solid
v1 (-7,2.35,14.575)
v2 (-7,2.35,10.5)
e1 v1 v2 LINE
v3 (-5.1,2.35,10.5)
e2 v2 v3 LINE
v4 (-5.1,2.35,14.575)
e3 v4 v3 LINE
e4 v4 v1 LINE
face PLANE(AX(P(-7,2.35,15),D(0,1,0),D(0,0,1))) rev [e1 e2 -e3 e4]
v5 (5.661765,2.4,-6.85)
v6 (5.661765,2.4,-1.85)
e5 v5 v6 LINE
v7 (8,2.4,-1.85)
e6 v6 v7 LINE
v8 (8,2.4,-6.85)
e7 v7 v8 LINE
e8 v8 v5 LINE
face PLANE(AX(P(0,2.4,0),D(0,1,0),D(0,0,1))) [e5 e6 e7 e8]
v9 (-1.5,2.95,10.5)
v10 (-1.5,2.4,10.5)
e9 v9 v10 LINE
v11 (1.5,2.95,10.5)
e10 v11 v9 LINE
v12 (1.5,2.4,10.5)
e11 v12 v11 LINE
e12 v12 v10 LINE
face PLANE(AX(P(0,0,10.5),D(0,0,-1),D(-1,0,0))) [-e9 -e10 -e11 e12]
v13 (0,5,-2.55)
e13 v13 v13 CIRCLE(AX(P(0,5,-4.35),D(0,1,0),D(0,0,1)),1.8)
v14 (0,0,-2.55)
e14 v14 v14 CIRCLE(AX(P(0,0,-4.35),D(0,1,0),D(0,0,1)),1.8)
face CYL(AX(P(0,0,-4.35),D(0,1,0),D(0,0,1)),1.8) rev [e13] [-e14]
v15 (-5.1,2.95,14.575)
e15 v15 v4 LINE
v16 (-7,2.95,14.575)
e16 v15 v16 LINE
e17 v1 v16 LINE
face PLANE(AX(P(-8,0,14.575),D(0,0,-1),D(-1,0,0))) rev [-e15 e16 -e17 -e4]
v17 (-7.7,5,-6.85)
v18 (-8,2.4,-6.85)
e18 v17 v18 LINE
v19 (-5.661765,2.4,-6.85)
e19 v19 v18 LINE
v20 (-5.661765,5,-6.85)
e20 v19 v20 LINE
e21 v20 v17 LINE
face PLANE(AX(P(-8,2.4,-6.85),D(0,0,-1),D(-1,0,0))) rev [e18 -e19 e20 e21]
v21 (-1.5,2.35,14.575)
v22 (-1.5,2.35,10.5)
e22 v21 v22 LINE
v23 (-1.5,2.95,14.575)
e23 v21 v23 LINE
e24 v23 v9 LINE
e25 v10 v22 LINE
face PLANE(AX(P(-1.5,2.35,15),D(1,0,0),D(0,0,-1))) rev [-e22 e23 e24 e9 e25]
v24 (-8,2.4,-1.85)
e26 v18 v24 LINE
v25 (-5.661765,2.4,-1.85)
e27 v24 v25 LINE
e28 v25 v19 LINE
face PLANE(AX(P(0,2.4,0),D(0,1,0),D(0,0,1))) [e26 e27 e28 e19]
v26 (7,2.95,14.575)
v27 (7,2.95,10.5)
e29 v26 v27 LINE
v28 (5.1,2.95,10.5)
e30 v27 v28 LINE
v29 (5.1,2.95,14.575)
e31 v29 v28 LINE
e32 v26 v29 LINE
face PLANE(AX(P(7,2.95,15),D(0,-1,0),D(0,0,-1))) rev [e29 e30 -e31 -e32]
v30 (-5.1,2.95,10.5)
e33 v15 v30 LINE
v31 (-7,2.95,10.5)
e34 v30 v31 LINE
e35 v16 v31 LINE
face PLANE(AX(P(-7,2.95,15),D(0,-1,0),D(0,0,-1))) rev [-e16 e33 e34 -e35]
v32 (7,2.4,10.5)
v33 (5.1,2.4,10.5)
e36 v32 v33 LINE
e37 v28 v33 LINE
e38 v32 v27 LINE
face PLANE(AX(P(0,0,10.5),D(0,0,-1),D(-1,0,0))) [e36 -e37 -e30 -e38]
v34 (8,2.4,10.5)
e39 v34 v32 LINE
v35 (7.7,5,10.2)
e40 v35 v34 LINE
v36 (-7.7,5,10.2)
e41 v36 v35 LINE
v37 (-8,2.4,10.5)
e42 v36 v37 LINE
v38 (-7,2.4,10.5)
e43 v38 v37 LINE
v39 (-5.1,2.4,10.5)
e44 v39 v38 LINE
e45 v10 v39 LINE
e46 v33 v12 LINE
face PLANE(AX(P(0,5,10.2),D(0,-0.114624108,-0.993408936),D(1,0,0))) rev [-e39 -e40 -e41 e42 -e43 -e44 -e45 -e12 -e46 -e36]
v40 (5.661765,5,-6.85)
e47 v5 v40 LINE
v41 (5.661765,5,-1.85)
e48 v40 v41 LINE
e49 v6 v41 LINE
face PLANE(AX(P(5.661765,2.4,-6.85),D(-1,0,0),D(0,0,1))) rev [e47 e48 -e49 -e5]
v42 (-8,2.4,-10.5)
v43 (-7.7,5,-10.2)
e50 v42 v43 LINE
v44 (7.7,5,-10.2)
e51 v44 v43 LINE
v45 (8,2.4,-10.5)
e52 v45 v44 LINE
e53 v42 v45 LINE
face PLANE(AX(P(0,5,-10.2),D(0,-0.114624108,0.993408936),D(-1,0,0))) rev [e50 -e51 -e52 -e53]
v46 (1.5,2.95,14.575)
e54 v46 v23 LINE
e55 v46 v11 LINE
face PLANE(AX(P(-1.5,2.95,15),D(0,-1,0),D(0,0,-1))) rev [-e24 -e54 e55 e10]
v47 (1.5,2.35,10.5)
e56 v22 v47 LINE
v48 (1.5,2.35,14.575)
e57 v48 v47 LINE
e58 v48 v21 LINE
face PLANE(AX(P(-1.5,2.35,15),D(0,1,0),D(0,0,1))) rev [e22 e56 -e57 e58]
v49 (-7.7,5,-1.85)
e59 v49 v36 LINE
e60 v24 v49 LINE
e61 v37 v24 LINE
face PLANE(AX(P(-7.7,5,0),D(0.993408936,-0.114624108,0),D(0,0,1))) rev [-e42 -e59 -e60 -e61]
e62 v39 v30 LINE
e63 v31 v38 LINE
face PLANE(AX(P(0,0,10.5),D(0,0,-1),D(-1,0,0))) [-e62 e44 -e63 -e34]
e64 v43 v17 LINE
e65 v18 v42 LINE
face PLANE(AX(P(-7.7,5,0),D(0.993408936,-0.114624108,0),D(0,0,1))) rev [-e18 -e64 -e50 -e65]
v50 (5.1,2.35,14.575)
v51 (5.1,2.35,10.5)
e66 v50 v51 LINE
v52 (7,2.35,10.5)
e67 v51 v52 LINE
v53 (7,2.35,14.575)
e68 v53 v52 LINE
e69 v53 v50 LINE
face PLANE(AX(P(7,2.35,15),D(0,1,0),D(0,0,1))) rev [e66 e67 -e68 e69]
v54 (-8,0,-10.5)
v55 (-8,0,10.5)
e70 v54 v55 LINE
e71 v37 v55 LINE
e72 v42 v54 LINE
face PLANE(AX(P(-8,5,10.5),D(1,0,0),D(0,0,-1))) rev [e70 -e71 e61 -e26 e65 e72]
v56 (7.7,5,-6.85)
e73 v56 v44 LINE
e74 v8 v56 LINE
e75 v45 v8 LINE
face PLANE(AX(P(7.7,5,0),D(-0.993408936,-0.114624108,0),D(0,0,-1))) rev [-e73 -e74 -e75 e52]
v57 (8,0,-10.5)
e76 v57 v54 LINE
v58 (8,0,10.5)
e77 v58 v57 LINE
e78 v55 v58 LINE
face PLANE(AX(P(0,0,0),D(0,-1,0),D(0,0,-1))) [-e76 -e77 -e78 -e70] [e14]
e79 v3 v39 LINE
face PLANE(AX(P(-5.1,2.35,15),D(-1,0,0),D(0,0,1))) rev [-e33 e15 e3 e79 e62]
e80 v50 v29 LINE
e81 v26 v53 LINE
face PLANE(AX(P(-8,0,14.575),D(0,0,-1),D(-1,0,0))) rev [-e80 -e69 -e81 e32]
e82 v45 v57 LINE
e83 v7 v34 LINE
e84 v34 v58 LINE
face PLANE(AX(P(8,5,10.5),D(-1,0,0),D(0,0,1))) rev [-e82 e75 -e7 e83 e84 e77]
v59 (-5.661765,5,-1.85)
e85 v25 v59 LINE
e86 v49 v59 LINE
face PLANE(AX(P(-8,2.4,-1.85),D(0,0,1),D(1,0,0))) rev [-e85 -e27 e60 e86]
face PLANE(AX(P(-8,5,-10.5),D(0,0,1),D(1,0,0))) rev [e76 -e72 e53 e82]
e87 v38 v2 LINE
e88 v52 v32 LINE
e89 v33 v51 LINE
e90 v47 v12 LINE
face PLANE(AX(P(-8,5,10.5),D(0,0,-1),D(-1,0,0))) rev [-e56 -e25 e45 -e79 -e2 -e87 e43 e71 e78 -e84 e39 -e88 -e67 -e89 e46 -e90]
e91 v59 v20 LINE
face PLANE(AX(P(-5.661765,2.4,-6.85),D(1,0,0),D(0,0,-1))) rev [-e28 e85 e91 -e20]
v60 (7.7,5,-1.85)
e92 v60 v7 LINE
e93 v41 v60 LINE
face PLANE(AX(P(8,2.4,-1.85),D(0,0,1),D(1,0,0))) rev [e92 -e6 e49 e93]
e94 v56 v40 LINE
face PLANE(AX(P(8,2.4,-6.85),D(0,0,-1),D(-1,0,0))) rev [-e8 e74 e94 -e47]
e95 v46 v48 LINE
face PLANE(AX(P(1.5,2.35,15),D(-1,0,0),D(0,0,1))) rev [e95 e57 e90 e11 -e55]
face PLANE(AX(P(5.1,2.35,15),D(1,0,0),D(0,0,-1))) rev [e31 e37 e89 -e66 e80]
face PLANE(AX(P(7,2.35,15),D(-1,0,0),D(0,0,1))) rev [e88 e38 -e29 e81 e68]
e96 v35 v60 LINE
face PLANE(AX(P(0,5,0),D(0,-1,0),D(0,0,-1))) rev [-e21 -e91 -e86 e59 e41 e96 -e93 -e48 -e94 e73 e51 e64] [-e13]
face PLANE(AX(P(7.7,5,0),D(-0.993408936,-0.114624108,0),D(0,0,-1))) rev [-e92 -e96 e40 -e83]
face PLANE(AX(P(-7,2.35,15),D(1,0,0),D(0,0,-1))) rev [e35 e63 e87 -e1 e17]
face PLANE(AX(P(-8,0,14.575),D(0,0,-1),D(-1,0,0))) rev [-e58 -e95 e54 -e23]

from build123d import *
from OCP.BRepFilletAPI import BRepFilletAPI_MakeChamfer

# Parameters (mm, degrees)
SKETCH1_W           = 16
SKETCH1_H           = 21
BOSS_EXTRUDE1_DEPTH = 5
SKETCH2_W           = 2.338235294
SKETCH2_H           = 5
CUT_EXTRUDE1_DEPTH  = 2.6
SKETCH3_R           = 1.8
CUT_EXTRUDE2_DEPTH  = 15.115594213
CHAMFER1_SIZE       = 2.6
CHAMFER1_SIZE2      = 0.3
SKETCH4_W           = 1.9
SKETCH4_H           = 0.6
SKETCH4_W_2         = 3
BOSS_EXTRUDE2_DEPTH = 4.5
SKETCH5_W           = 1.2
SKETCH5_H           = 0.6
BOSS_EXTRUDE3_DEPTH = 15.5
CHAMFER2_SIZE       = 0.4
CHAMFER3_SIZE       = 1
CHAMFER4_SIZE       = 0.5
SKETCH6_W           = 21.119407152
SKETCH6_H           = 13.185156935
CUT_EXTRUDE3_DEPTH  = 32.669425318
SKETCH7_W           = 15.715970721
SKETCH7_H           = 3.676449557
CUT_EXTRUDE4_DEPTH  = 20.696256624


with BuildPart() as part:
    # Sketch1 → Boss-Extrude1 (new body)
    with BuildSketch(Plane(origin=(0, 0, 0), x_dir=(1, 0, 0), z_dir=(0, 1, 0))):
        Rectangle(SKETCH1_W, SKETCH1_H)
    extrude(amount=BOSS_EXTRUDE1_DEPTH)

    # Sketch2 → Cut-Extrude1 (cut)
    with BuildSketch(Plane(origin=(0, 5, 0), x_dir=(1, 0, 0), z_dir=(0, 1, 0))):
        with Locations((-6.830882353, 4.35)):
            Rectangle(SKETCH2_W, SKETCH2_H)
        with Locations((6.830882353, 4.35)):
            Rectangle(SKETCH2_W, SKETCH2_H)
    extrude(amount=-CUT_EXTRUDE1_DEPTH, mode=Mode.SUBTRACT)

    # Sketch3 → Cut-Extrude2 (cut, through all)
    with BuildSketch(Plane(origin=(0, 5, 0), x_dir=(1, 0, 0), z_dir=(0, 1, 0))):
        with Locations(Location((0, 4.35, 0), (0, 0, 270))):
            Circle(SKETCH3_R)
    extrude(amount=-CUT_EXTRUDE2_DEPTH, mode=Mode.SUBTRACT)

    # Chamfer1: one chamfer whose edges measure the first distance from different faces: ONE call of the kernel's chamfer builder (chamfer() names one face for all edges)
    chamfer1_edges_1 = [part.edges().sort_by_distance(p)[0] for p in [
        (8, 5, 4.325),
        (8, 5, -8.675),
    ]]
    chamfer1_side_1 = [part.faces().sort_by_distance(p)[0] for p in [
        (8, 2.330434783, 0.614673913),
    ]]
    chamfer1_edges_2 = [part.edges().sort_by_distance(p)[0] for p in [
        (-8, 5, 4.325),
        (-8, 5, -8.675),
    ]]
    chamfer1_side_2 = [part.faces().sort_by_distance(p)[0] for p in [
        (-8, 2.330434783, 0.614673913),
    ]]
    chamfer1_edges_3 = [part.edges().sort_by_distance(p)[0] for p in [
        (0, 5, -10.5),
    ]]
    chamfer1_side_3 = [part.faces().sort_by_distance(p)[0] for p in [
        (0, 2.5, -10.5),
    ]]
    chamfer1_edges_4 = [part.edges().sort_by_distance(p)[0] for p in [
        (0, 5, 10.5),
    ]]
    chamfer1_side_4 = [part.faces().sort_by_distance(p)[0] for p in [
        (0, 2.5, 10.5),
    ]]
    chamfer1 = BRepFilletAPI_MakeChamfer(part.part.solid().wrapped)
    for e in chamfer1_edges_1:
        chamfer1.Add(CHAMFER1_SIZE, CHAMFER1_SIZE2, e.wrapped, chamfer1_side_1[0].wrapped)  # the first distance lies on this face
    for e in chamfer1_edges_2:
        chamfer1.Add(CHAMFER1_SIZE, CHAMFER1_SIZE2, e.wrapped, chamfer1_side_2[0].wrapped)  # the first distance lies on this face
    for e in chamfer1_edges_3:
        chamfer1.Add(CHAMFER1_SIZE, CHAMFER1_SIZE2, e.wrapped, chamfer1_side_3[0].wrapped)  # the first distance lies on this face
    for e in chamfer1_edges_4:
        chamfer1.Add(CHAMFER1_SIZE, CHAMFER1_SIZE2, e.wrapped, chamfer1_side_4[0].wrapped)  # the first distance lies on this face
    add(Compound.cast(chamfer1.Shape()), mode=Mode.REPLACE)

    # Sketch4 → Boss-Extrude2 (add)
    with BuildSketch(Plane.XY.offset(10.5)):
        with Locations((-6.05, 2.65)):
            Rectangle(SKETCH4_W, SKETCH4_H)
        with Locations((6.05, 2.65)):
            Rectangle(SKETCH4_W, SKETCH4_H)
        with Locations((0, 2.65)):
            Rectangle(SKETCH4_W_2, SKETCH4_H)
    extrude(amount=BOSS_EXTRUDE2_DEPTH)

    # Sketch5 → Boss-Extrude3 (add)
    with BuildSketch(Plane.XY.offset(15)):
        with Locations((-6.05, 2.65)):
            Rectangle(SKETCH5_W, SKETCH5_H)
        with Locations((0, 2.65)):
            Rectangle(SKETCH5_W, SKETCH5_H)
        with Locations((6.05, 2.65)):
            Rectangle(SKETCH5_W, SKETCH5_H)
    extrude(amount=BOSS_EXTRUDE3_DEPTH)

    # Chamfer2
    # the kernel refuses this chamfer: 0.4 mm, written as the material it adds along each edge
    with BuildSketch(Plane(origin=(-5.45, 2.35, 15), x_dir=(0.9996219169112966, 0, -0.027495876610587302), z_dir=(0, 1, 0))) as chamfer2_piece_1_section:
        Polygon((CHAMFER2_SIZE * 0.999621916911, -CHAMFER2_SIZE * 0.0274958766106), (-CHAMFER2_SIZE * 0.0274958766106, -CHAMFER2_SIZE * 0.999621916911), (0, 0), align=None)
    chamfer2_piece_1 = extrude(amount=0.6, mode=Mode.PRIVATE)
    chamfer2_piece_1 = split(chamfer2_piece_1, bisect_by=Plane(origin=(-5.1, 2.65, 15.135195933), z_dir=(-1, 0, 0)), keep=Keep.TOP, mode=Mode.PRIVATE)
    add(chamfer2_piece_1)
    with BuildSketch(Plane(origin=(6.65, 2.95, 15), x_dir=(0.9996219169112966, 0, -0.027495876610587302), z_dir=(0, -1, 0))) as chamfer2_piece_2_section:
        Polygon((CHAMFER2_SIZE * 0.999621916911, CHAMFER2_SIZE * 0.0274958766106), (-CHAMFER2_SIZE * 0.0274958766106, CHAMFER2_SIZE * 0.999621916911), (0, 0), align=None)
    chamfer2_piece_2 = extrude(amount=0.6, mode=Mode.PRIVATE)
    chamfer2_piece_2 = split(chamfer2_piece_2, bisect_by=Plane(origin=(7, 2.65, 15.135195933), z_dir=(-1, 0, 0)), keep=Keep.TOP, mode=Mode.PRIVATE)
    add(chamfer2_piece_2)
    with BuildSketch(Plane(origin=(5.45, 2.35, 15), x_dir=(-0.9996219169112966, 0, -0.027495876610587302), z_dir=(0, 1, 0))) as chamfer2_piece_3_section:
        Polygon((CHAMFER2_SIZE * 0.999621916911, CHAMFER2_SIZE * 0.0274958766106), (-CHAMFER2_SIZE * 0.0274958766106, CHAMFER2_SIZE * 0.999621916911), (0, 0), align=None)
    chamfer2_piece_3 = extrude(amount=0.6, mode=Mode.PRIVATE)
    chamfer2_piece_3 = split(chamfer2_piece_3, bisect_by=Plane(origin=(5.1, 2.65, 15.135195933), z_dir=(1, 0, 0)), keep=Keep.TOP, mode=Mode.PRIVATE)
    add(chamfer2_piece_3)
    with BuildSketch(Plane(origin=(-6.65, 2.95, 15), x_dir=(-0.9996219169112966, 0, -0.027495876610587302), z_dir=(0, -1, 0))) as chamfer2_piece_4_section:
        Polygon((CHAMFER2_SIZE * 0.999621916911, -CHAMFER2_SIZE * 0.0274958766106), (-CHAMFER2_SIZE * 0.0274958766106, -CHAMFER2_SIZE * 0.999621916911), (0, 0), align=None)
    chamfer2_piece_4 = extrude(amount=0.6, mode=Mode.PRIVATE)
    chamfer2_piece_4 = split(chamfer2_piece_4, bisect_by=Plane(origin=(-7, 2.65, 15.135195933), z_dir=(1, 0, 0)), keep=Keep.TOP, mode=Mode.PRIVATE)
    add(chamfer2_piece_4)

    # Chamfer3
    # the kernel refuses this chamfer: 1 mm, written as the material it adds along each edge
    with BuildSketch(Plane(origin=(0.6, 2.35, 15), x_dir=(0.9996219169112968, 0, -0.027495876610585623), z_dir=(0, 1, 0))) as chamfer3_piece_1_section:
        Polygon((CHAMFER3_SIZE * 0.999621916911, -CHAMFER3_SIZE * 0.0274958766106), (-CHAMFER3_SIZE * 0.0274958766106, -CHAMFER3_SIZE * 0.999621916911), (0, 0), align=None)
    chamfer3_piece_1 = extrude(amount=0.6, mode=Mode.PRIVATE)
    chamfer3_piece_1 = split(chamfer3_piece_1, bisect_by=Plane(origin=(1.5, 2.65, 15.335900747), z_dir=(-1, 0, 0)), keep=Keep.TOP, mode=Mode.PRIVATE)
    add(chamfer3_piece_1)
    with BuildSketch(Plane(origin=(-0.6, 2.95, 15), x_dir=(0.02749587661058645, 0, 0.9996219169112968), z_dir=(0, -1, 0))) as chamfer3_piece_2_section:
        Polygon((CHAMFER3_SIZE * 0.999621916911, CHAMFER3_SIZE * 0.0274958766106), (-CHAMFER3_SIZE * 0.0274958766106, CHAMFER3_SIZE * 0.999621916911), (0, 0), align=None)
    chamfer3_piece_2 = extrude(amount=0.6, mode=Mode.PRIVATE)
    chamfer3_piece_2 = split(chamfer3_piece_2, bisect_by=Plane(origin=(-1.5, 2.65, 15.335900747), z_dir=(1, 0, 0)), keep=Keep.TOP, mode=Mode.PRIVATE)
    add(chamfer3_piece_2)

    # Chamfer4
    chamfer4_edges = [part.edges().sort_by_distance(p)[0] for p in [
        (5.45, 2.65, 30.5),
        (6.65, 2.65, 30.5),
        (0.6, 2.65, 30.5),
        (-0.6, 2.65, 30.5),
        (-5.45, 2.65, 30.5),
        (-6.65, 2.65, 30.5),
    ]]
    chamfer(chamfer4_edges, length=CHAMFER4_SIZE)

    # Sketch6 → Cut-Extrude3 (cut, through all)
    with BuildSketch(Plane(origin=(0, 2.95, 0), x_dir=(1, 0, 0), z_dir=(0, 1, 0))):
        with Locations((0.165735258, -24.347578467)):
            Rectangle(SKETCH6_W, SKETCH6_H)
    extrude(amount=-CUT_EXTRUDE3_DEPTH, mode=Mode.SUBTRACT)

    # Sketch7 → Cut-Extrude4 (cut, through all)
    with BuildSketch(Plane(origin=(0, 2.95, 0), x_dir=(1, 0, 0), z_dir=(0, 1, 0))):
        with Locations((-0.142014639, -16.413224779)):
            Rectangle(SKETCH7_W, SKETCH7_H)
    extrude(amount=-CUT_EXTRUDE4_DEPTH, mode=Mode.SUBTRACT)


solid = part.part
